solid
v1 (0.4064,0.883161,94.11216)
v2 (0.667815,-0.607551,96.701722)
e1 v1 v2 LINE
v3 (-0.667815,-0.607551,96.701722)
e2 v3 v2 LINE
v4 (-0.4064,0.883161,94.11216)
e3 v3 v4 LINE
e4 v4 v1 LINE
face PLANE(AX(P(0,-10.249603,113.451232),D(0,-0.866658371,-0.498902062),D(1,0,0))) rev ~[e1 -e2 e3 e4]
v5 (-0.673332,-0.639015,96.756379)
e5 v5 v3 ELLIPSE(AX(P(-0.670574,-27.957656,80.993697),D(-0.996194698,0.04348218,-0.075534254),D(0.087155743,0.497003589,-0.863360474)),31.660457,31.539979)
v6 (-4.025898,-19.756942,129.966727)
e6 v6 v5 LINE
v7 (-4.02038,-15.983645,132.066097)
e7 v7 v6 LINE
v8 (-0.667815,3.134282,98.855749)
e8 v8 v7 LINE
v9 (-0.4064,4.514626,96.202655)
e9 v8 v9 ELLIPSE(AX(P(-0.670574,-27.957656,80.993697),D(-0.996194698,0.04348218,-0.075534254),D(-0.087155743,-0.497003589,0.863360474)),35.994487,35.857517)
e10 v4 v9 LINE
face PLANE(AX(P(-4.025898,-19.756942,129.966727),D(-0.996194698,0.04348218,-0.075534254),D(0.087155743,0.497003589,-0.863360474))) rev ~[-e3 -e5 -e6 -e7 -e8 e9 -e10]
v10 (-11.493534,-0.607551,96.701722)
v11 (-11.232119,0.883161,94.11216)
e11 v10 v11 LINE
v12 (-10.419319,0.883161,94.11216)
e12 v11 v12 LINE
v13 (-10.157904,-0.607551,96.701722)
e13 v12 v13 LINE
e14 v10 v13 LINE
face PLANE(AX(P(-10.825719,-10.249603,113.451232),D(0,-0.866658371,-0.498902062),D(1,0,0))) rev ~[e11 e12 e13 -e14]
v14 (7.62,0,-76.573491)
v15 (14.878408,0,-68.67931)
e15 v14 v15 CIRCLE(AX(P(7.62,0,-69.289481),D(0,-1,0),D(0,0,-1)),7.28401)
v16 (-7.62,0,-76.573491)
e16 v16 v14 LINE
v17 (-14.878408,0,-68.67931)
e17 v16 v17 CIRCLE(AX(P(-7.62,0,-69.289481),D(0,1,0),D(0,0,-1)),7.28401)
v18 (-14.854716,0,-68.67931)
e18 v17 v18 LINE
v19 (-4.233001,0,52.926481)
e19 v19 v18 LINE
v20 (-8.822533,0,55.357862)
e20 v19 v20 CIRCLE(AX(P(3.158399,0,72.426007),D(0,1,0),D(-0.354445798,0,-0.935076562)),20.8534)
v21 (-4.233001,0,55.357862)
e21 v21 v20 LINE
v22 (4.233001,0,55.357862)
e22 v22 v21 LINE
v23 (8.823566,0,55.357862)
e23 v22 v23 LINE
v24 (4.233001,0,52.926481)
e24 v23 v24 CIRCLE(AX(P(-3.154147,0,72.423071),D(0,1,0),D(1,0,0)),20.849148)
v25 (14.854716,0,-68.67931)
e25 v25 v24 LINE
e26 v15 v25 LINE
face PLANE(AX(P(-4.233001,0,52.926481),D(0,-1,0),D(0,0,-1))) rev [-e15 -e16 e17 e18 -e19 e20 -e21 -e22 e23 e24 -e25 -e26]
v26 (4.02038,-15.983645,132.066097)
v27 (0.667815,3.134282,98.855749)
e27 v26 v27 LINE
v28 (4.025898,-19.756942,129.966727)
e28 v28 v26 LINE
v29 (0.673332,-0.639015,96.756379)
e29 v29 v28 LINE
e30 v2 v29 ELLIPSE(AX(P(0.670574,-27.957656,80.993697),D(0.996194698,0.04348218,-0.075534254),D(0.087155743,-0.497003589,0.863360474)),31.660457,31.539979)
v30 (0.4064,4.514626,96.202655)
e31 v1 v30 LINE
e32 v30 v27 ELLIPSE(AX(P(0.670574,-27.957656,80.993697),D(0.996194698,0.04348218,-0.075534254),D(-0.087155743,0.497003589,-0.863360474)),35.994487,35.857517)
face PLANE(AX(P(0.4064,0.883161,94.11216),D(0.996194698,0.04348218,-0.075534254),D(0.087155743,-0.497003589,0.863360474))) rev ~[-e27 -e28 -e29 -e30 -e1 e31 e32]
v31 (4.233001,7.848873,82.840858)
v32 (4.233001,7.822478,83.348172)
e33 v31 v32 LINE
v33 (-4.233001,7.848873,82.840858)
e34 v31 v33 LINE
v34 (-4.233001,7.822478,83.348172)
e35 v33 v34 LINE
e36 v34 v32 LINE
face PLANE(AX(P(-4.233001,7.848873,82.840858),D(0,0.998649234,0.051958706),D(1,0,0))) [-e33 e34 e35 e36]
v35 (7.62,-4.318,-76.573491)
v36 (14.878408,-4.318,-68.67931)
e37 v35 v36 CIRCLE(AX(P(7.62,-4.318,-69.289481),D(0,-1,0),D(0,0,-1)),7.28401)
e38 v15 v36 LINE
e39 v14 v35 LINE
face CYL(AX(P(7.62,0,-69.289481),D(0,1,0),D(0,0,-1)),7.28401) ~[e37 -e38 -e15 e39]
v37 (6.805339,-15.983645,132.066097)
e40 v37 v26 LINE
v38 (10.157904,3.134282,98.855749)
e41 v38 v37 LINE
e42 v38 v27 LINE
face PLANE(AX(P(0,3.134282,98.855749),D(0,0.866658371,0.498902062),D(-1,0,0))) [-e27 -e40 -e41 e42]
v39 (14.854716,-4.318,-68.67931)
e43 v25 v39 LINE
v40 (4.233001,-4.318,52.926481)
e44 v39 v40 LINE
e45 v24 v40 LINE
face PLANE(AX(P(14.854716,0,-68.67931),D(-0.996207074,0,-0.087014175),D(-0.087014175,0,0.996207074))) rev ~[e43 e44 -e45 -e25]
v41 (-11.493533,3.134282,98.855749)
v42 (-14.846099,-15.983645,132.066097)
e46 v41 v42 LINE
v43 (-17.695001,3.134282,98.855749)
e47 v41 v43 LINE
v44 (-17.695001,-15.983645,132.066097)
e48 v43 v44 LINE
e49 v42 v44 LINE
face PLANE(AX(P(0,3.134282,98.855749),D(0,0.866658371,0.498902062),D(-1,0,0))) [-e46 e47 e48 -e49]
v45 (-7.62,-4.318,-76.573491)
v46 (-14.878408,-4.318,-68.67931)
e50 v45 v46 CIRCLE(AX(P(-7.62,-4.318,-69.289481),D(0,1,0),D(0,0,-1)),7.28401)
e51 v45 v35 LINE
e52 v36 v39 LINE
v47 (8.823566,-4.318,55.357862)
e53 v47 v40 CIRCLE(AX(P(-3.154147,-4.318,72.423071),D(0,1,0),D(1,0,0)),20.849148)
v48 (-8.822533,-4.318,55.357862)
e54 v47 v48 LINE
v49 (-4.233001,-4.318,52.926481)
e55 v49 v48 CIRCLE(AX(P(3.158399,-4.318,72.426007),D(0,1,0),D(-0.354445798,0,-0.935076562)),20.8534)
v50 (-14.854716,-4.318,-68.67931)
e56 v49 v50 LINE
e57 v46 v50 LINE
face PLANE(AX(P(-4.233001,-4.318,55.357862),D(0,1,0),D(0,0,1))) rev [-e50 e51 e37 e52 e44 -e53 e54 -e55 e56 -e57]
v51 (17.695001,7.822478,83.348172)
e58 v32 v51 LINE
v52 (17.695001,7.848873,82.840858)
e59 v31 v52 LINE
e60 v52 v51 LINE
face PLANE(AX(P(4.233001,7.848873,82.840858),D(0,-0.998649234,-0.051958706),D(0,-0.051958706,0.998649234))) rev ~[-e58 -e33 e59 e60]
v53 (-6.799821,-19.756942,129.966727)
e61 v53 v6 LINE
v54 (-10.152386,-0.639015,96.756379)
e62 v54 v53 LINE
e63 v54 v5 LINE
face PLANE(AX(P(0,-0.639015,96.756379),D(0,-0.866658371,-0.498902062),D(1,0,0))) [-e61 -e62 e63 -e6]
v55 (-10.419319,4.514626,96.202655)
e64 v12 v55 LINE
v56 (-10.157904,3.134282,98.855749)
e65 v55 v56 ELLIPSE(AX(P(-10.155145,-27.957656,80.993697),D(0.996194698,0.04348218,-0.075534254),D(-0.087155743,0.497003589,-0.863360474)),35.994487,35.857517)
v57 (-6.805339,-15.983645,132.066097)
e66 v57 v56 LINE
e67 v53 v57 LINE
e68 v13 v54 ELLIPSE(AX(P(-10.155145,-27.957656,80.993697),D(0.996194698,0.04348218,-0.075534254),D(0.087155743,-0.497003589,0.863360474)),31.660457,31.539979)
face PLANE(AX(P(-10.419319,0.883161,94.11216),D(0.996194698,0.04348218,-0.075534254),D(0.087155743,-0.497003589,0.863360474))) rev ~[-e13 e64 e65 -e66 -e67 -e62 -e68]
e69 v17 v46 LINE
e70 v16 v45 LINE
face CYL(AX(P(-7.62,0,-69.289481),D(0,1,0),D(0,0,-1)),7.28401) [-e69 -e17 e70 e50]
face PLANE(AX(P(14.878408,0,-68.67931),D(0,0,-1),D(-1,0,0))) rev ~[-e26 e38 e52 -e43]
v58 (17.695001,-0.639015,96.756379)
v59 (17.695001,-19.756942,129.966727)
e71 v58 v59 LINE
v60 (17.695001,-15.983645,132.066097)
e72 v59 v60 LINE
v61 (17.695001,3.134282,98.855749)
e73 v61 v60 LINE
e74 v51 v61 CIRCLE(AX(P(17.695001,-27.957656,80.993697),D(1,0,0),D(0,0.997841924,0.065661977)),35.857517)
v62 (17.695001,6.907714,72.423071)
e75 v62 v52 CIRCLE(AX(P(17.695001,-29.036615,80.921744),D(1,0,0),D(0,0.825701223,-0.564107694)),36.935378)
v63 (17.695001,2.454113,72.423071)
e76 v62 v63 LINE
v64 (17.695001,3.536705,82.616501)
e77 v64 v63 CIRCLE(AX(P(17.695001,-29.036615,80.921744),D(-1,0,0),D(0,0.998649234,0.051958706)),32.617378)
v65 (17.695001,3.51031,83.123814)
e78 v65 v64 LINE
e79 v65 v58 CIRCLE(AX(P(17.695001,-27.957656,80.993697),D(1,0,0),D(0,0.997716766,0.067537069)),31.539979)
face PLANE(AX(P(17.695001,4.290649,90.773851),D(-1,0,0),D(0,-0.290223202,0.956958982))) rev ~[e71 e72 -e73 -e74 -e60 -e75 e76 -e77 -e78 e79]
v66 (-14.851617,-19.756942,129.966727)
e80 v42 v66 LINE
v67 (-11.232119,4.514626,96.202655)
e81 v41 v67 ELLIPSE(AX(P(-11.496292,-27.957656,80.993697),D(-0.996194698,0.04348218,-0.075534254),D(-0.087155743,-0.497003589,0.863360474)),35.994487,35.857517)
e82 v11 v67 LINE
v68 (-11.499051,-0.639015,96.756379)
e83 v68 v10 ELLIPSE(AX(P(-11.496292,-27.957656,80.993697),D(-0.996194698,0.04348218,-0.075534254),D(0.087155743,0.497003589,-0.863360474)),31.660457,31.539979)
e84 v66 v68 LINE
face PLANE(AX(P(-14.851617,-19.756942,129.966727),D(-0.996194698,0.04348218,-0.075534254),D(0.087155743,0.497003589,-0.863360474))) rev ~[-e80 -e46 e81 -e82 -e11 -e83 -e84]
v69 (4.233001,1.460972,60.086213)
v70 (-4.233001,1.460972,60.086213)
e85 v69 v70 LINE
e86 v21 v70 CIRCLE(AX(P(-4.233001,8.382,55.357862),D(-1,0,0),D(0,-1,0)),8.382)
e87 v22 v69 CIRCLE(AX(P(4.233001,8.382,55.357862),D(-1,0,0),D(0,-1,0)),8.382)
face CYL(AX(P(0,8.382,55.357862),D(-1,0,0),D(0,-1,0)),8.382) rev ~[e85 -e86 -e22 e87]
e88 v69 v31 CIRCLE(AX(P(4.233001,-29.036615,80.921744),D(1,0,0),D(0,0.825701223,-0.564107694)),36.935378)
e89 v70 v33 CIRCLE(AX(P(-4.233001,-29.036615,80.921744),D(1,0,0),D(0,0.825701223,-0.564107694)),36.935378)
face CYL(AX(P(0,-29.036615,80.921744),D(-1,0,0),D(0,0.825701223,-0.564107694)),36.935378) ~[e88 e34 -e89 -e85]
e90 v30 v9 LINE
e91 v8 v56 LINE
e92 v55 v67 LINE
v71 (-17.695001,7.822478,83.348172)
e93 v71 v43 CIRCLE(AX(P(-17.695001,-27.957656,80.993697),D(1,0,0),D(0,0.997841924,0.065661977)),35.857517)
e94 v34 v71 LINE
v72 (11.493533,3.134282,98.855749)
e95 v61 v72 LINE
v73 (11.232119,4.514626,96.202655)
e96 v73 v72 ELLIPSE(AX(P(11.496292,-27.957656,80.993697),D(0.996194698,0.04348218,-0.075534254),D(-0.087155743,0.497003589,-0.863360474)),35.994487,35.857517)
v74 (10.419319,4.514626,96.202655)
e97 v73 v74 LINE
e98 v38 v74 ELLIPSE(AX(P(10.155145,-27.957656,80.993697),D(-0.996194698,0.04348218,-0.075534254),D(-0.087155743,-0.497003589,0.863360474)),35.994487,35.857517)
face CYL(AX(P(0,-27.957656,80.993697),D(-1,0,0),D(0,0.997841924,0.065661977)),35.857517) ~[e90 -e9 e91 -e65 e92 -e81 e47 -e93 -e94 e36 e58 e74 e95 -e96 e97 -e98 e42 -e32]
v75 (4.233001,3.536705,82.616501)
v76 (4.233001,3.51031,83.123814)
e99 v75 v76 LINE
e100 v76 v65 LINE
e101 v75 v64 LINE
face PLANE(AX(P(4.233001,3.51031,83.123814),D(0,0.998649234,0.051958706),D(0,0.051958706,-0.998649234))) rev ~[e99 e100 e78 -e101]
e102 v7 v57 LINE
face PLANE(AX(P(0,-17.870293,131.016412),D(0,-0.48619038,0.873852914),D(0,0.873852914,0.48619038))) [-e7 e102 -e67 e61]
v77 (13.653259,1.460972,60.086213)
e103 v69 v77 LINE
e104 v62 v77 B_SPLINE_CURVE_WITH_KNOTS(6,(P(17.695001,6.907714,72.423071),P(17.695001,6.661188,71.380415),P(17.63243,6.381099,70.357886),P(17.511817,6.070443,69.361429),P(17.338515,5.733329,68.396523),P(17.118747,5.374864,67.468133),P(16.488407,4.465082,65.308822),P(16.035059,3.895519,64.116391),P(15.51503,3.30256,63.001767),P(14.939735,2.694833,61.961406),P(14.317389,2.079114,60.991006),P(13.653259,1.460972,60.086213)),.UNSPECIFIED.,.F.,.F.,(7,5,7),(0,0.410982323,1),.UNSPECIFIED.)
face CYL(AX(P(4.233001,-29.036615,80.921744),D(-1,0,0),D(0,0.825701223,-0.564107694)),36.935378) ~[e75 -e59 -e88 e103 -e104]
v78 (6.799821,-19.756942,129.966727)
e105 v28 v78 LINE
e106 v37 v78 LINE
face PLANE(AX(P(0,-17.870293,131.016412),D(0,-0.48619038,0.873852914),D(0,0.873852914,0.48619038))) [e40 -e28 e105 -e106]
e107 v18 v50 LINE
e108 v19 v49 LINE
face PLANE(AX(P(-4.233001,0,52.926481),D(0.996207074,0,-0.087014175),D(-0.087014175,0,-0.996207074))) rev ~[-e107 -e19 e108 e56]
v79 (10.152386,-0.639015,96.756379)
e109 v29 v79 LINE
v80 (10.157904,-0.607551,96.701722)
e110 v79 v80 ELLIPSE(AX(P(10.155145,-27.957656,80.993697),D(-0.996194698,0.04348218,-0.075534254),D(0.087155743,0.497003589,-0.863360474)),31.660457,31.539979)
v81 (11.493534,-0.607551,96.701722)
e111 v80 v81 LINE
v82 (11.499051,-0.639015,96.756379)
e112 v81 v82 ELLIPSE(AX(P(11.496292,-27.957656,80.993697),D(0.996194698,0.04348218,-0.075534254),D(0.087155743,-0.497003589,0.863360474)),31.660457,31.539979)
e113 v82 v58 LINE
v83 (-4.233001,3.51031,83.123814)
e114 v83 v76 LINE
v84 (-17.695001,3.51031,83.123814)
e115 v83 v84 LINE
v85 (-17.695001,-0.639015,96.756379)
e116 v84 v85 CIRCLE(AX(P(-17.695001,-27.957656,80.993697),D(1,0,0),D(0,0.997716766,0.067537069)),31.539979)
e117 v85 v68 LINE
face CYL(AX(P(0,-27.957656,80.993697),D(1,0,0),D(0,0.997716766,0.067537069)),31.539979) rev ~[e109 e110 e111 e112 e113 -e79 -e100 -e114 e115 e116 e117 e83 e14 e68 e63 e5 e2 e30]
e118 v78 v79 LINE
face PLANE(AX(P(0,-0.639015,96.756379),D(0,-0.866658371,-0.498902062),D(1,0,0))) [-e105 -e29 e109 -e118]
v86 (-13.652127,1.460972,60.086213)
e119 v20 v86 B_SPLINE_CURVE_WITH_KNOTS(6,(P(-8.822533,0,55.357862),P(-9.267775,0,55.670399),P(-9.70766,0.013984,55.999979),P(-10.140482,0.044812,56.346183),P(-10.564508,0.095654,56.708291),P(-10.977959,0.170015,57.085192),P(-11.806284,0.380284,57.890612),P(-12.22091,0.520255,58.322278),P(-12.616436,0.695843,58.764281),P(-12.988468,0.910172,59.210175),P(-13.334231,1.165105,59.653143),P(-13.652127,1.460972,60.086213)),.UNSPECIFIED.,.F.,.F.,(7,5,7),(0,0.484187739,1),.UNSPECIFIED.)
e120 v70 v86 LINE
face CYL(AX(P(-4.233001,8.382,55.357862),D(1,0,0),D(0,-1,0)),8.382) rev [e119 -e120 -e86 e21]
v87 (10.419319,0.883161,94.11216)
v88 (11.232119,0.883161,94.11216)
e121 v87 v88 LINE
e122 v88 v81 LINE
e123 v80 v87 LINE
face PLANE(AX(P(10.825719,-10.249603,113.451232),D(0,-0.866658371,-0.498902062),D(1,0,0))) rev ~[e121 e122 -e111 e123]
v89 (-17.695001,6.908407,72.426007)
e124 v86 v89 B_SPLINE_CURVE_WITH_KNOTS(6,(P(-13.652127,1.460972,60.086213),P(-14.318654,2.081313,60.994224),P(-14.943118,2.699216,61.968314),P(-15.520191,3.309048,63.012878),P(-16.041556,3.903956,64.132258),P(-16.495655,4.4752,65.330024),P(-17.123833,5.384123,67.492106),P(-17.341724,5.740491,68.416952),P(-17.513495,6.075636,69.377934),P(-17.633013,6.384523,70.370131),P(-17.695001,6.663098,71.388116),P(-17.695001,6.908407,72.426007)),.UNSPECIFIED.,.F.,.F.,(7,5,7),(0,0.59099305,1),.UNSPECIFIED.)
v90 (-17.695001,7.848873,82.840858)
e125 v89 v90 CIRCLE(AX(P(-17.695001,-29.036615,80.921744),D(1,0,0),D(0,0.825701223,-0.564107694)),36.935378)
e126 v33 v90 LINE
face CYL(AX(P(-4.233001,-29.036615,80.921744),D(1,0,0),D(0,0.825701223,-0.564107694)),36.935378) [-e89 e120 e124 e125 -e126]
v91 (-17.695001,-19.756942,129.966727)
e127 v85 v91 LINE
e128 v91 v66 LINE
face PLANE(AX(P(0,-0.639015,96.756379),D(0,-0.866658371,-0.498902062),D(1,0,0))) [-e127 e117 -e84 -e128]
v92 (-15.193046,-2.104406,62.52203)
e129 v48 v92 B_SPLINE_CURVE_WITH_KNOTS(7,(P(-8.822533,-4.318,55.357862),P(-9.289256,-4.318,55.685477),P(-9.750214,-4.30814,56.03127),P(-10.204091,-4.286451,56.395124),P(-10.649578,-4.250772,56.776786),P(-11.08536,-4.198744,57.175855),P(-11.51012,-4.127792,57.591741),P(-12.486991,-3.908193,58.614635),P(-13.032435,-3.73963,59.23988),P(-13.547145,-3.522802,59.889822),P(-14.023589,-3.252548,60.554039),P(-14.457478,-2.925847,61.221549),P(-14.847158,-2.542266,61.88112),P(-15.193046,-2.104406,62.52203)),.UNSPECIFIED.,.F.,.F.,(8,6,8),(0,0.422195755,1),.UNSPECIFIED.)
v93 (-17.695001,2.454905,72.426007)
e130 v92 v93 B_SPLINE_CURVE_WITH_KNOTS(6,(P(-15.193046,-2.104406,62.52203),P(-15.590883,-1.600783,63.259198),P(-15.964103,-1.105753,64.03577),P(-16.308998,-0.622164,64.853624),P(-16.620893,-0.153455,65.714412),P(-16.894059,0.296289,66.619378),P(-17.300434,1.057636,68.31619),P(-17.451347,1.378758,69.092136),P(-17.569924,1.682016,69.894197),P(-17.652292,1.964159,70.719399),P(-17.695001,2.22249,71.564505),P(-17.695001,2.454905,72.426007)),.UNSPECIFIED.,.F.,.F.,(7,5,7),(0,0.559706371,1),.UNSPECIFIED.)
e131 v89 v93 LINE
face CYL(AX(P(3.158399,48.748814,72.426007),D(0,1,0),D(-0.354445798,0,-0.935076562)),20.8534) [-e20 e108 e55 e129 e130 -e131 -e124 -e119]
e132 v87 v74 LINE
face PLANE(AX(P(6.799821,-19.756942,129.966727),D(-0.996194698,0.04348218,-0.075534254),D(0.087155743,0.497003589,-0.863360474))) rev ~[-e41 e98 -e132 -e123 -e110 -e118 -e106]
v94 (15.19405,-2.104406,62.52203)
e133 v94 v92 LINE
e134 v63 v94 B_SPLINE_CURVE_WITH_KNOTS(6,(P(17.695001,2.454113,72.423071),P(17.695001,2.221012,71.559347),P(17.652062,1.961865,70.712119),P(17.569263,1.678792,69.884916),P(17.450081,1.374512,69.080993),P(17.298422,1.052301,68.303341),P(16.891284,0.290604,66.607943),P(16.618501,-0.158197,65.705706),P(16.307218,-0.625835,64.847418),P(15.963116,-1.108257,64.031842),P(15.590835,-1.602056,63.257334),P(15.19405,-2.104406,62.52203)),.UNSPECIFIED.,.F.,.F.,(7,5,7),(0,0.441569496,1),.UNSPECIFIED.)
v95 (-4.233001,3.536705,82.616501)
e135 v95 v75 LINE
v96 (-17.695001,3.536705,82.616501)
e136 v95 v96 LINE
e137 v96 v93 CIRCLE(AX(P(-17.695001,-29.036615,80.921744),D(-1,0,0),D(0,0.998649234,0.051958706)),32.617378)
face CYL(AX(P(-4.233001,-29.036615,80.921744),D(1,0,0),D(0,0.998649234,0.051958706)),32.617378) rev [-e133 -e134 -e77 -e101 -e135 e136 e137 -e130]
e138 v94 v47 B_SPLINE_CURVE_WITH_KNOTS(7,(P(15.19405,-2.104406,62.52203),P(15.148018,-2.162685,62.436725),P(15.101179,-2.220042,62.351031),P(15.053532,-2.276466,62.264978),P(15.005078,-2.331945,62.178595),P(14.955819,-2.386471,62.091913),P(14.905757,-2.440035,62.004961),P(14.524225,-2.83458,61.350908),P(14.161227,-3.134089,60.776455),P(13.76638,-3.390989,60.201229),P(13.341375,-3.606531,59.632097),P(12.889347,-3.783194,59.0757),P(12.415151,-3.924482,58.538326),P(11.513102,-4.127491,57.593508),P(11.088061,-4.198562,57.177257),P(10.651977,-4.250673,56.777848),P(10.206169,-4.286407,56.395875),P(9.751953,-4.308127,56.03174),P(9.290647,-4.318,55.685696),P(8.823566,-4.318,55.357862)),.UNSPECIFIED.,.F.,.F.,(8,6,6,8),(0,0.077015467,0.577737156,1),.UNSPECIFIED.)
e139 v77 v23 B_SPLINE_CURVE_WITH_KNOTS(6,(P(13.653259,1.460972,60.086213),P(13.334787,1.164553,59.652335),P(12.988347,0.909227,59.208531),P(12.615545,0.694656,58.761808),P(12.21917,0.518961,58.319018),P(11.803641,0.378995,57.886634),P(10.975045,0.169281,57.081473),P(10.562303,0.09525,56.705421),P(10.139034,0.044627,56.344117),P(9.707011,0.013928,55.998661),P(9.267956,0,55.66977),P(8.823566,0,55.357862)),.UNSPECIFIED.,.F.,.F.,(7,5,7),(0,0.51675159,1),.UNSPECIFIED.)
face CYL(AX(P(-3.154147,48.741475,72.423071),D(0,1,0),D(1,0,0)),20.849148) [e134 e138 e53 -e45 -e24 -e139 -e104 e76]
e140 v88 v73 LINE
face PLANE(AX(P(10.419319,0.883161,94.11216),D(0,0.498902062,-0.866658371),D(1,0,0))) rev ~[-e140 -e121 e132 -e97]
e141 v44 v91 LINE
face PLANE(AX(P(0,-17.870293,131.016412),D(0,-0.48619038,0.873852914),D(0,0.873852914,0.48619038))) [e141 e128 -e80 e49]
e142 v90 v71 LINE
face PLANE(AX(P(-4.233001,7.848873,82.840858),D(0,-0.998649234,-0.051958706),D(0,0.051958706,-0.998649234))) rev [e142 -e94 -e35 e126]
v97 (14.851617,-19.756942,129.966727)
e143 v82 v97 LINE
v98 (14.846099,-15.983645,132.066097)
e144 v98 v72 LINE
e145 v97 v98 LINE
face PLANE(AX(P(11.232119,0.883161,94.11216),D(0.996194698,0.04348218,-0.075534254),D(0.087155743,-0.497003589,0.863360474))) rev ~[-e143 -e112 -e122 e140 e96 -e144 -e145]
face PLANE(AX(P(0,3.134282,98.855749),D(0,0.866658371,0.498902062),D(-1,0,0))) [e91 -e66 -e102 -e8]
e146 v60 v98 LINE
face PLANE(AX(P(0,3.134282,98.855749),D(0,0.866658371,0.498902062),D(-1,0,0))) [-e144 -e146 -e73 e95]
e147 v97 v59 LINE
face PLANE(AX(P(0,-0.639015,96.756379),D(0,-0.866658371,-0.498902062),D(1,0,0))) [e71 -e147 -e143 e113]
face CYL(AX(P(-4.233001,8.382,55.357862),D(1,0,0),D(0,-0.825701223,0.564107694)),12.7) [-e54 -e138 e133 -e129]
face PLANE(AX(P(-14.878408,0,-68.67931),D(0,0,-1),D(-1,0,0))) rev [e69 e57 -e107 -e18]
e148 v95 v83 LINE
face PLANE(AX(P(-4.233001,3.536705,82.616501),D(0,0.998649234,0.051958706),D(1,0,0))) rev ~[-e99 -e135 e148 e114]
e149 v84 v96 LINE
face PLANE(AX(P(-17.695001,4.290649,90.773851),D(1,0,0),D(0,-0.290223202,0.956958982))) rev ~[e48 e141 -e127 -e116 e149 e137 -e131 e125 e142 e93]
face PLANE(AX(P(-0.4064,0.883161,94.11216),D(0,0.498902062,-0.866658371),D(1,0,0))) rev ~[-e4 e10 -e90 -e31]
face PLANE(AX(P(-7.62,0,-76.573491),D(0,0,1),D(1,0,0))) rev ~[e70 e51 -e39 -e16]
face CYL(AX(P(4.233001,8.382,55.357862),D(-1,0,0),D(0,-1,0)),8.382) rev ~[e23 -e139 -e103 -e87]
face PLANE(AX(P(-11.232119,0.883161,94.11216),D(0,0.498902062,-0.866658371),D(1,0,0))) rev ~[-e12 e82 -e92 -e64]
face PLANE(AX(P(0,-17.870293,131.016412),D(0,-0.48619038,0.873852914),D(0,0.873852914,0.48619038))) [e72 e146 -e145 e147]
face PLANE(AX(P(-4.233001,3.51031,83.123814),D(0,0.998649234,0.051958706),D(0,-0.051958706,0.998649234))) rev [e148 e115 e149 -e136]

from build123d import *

# Parameters (mm, degrees)
F1_DEPTH     = 4.318
F1_FACE_W    = 8.4660017827
F1_FACE_H    = 4.318
F4_W         = 8.4660017827
F4_H         = 4.318
F5_DEPTH     = 0.508
F7_DEPTH     = 13.462
F9_T1_DEPTH  = 101.8009504956
F10_T1_DEPTH = 101.8156278686
F8_FACE_W    = 35.3900017827
F8_FACE_H    = 4.318
F14_DEPTH    = 45.466


# Not quite as in the source:
# - a fillet or chamfer that OpenCascade refuses, or shapes differently, is made with other operations: its cross-section is extruded or revolved along the edge and cut away or added


with BuildPart() as f1:
    # F0 (on Front) → F1 (new body)
    with BuildSketch(Plane.XZ):
        with BuildLine():
            ThreePointArc((-14.8547158409, -68.6793103814), (-12.973951869, -74.217922925), (-7.62, -76.5734910965))
            Line((-7.62, -76.5734910965), (7.62, -76.5734910965))
            ThreePointArc((7.62, -76.5734910965), (12.9819628095, -74.2196084737), (14.8784083325, -68.6793103814))
            Line((14.8784083325, -68.6793103814), (14.8547158409, -68.6793103814))
            Line((14.8547158409, -68.6793103814), (-14.8547158409, -68.6793103814))
        make_face()
        Polygon((-7.1831139455, 19.1512540919), (-14.8547158409, -68.6793103814), (14.8547158409, -68.6793103814), (7.1831139455, 19.1512540919), (4.2330008913, 52.9264810056), (-4.2330008913, 52.9264810056), align=None)
    extrude(amount=F1_DEPTH)

    # F3: sweep along a path in F2
    with BuildLine(Plane.YZ) as f3_path:
        Line((-4.318, 52.9264810056), (-4.318, 55.3578620488))
        ThreePointArc((-4.318, 55.3578620488), (-3.7519884271, 59.1070386053), (-2.1044055351, 62.5220297571))
        ThreePointArc((-2.1044055351, 62.5220297571), (2.3667917296, 72.1058812805), (3.5367051605, 82.6165005565))
    # F1_face (on face) → F3 (sweep)
    with BuildSketch(Plane(origin=(0, -2.159, 52.9264810056), x_dir=(1, 0, 0), z_dir=(0, 0, 1))):
        Rectangle(F1_FACE_W, F1_FACE_H)
    sweep(path=f3_path.line)

    # F4 (on face) → F5 (join)
    with BuildSketch(Plane(origin=(0, -4.2773000259, 82.2099457989), x_dir=(1, 0, 0), z_dir=(0, -0.0519587059, 0.9986492342))):
        with Locations((0, 9.9835743541)):
            Rectangle(F4_W, F4_H)
    extrude(amount=F5_DEPTH)

    # F6 (on face) → F7 (join)
    with BuildSketch(Plane.YZ.offset(4.2330008913)):
        with BuildLine():
            Line((-4.318, 52.9264810056), (0, 52.9264810056))
            Line((0, 52.9264810056), (0, 55.3578620488))
            ThreePointArc((0, 55.3578620488), (0.3735676381, 57.8323185761), (1.4609723468, 60.0862127363))
            ThreePointArc((1.4609723468, 60.0862127363), (6.5240819847, 70.938807275), (7.8488725536, 82.8408582485))
            Line((7.8488725536, 82.8408582485), (7.822477531, 83.3481720595))
            Line((7.822477531, 83.3481720595), (3.5103101379, 83.1238143674))
            Line((3.5103101379, 83.1238143674), (3.5367051605, 82.6165005565))
            ThreePointArc((3.5367051605, 82.6165005565), (2.3667917296, 72.1058812805), (-2.1044055351, 62.5220297571))
            ThreePointArc((-2.1044055351, 62.5220297571), (-3.7519884271, 59.1070386053), (-4.318, 55.3578620488))
            Line((-4.318, 55.3578620488), (-4.318, 52.9264810056))
        make_face()
    extrude(amount=F7_DEPTH)

    # F8: F1 across plane


with BuildPart() as f1_1:
    add(f1.part)
    add(f1.part.mirror(Plane.YZ))

    # F9: fillet of radius 20.8491483247 on 1 edges, made by hand

    # F9_s2 → F9_t1 (cut)
    with BuildSketch(Plane.XZ.offset(-48.7414752478)):
        with BuildLine():
            ThreePointArc((17.6950008913, 72.4230711047), (14.0025238199, 60.5767376056), (4.2330008913, 52.9264810056))
            Line((4.2330008913, 52.9264810056), (17.6950008913, 52.9264810056))
            Line((17.6950008913, 52.9264810056), (17.6950008913, 72.4230711047))
        make_face()
    extrude(amount=F9_T1_DEPTH, mode=Mode.SUBTRACT)

    # F10: fillet of radius 20.8534 on 1 edges, made by hand

    # F10_s2 → F10_t1 (cut)
    with BuildSketch(Plane.XZ.offset(-48.7488139343)):
        with BuildLine():
            ThreePointArc((-4.2330008913, 52.9264810056), (-14.0026048293, 60.5784652564), (-17.6950008913, 72.4260065793))
            Line((-17.6950008913, 72.4260065793), (-17.6950008913, 52.9264810056))
            Line((-17.6950008913, 52.9264810056), (-4.2330008913, 52.9264810056))
        make_face()
    extrude(amount=F10_T1_DEPTH, mode=Mode.SUBTRACT)

    # F12: sweep along a path in F11
    with BuildLine(Plane.YZ) as f12_path:
        ThreePointArc((5.6663938345, 83.2359932134), (4.2906494395, 90.7738508992), (1.2476332355, 97.8060641719))
        Line((1.2476332355, 97.8060641719), (-17.8702931298, 131.016411811))
    # F8_face (on face) → F12 (sweep)
    with BuildSketch(Plane(origin=(0, 5.6663938345, 83.2359932134), x_dir=(1, 0, 0), z_dir=(0, -0.0519587059, 0.9986492342))):
        Rectangle(F8_FACE_W, F8_FACE_H)
    sweep(path=f12_path.line)

    # F13 (on face) → F14 (cut)
    with BuildSketch(Plane(origin=(0, 41.3553334691, 23.8066830455), x_dir=(1, 0, 0), z_dir=(0, -0.8666583712, -0.4989020622))):
        Polygon((-6.7998209327, 122.4935306315), (-14.8516167313, 122.4935306315), (-11.232118832, 81.1224803329), (-10.419318832, 81.1224803329), align=None)
        Polygon((4.0258978993, 122.4935306315), (-4.0258978993, 122.4935306315), (-0.4064, 81.1224803329), (0, 81.1224803329), (0.4064, 81.1224803329), align=None)
        Polygon((11.232118832, 81.1224803329), (14.8516167313, 122.4935306315), (6.7998209327, 122.4935306315), (10.419318832, 81.1224803329), align=None)
    extrude(amount=-F14_DEPTH, mode=Mode.SUBTRACT)


solid = f1_1.part
